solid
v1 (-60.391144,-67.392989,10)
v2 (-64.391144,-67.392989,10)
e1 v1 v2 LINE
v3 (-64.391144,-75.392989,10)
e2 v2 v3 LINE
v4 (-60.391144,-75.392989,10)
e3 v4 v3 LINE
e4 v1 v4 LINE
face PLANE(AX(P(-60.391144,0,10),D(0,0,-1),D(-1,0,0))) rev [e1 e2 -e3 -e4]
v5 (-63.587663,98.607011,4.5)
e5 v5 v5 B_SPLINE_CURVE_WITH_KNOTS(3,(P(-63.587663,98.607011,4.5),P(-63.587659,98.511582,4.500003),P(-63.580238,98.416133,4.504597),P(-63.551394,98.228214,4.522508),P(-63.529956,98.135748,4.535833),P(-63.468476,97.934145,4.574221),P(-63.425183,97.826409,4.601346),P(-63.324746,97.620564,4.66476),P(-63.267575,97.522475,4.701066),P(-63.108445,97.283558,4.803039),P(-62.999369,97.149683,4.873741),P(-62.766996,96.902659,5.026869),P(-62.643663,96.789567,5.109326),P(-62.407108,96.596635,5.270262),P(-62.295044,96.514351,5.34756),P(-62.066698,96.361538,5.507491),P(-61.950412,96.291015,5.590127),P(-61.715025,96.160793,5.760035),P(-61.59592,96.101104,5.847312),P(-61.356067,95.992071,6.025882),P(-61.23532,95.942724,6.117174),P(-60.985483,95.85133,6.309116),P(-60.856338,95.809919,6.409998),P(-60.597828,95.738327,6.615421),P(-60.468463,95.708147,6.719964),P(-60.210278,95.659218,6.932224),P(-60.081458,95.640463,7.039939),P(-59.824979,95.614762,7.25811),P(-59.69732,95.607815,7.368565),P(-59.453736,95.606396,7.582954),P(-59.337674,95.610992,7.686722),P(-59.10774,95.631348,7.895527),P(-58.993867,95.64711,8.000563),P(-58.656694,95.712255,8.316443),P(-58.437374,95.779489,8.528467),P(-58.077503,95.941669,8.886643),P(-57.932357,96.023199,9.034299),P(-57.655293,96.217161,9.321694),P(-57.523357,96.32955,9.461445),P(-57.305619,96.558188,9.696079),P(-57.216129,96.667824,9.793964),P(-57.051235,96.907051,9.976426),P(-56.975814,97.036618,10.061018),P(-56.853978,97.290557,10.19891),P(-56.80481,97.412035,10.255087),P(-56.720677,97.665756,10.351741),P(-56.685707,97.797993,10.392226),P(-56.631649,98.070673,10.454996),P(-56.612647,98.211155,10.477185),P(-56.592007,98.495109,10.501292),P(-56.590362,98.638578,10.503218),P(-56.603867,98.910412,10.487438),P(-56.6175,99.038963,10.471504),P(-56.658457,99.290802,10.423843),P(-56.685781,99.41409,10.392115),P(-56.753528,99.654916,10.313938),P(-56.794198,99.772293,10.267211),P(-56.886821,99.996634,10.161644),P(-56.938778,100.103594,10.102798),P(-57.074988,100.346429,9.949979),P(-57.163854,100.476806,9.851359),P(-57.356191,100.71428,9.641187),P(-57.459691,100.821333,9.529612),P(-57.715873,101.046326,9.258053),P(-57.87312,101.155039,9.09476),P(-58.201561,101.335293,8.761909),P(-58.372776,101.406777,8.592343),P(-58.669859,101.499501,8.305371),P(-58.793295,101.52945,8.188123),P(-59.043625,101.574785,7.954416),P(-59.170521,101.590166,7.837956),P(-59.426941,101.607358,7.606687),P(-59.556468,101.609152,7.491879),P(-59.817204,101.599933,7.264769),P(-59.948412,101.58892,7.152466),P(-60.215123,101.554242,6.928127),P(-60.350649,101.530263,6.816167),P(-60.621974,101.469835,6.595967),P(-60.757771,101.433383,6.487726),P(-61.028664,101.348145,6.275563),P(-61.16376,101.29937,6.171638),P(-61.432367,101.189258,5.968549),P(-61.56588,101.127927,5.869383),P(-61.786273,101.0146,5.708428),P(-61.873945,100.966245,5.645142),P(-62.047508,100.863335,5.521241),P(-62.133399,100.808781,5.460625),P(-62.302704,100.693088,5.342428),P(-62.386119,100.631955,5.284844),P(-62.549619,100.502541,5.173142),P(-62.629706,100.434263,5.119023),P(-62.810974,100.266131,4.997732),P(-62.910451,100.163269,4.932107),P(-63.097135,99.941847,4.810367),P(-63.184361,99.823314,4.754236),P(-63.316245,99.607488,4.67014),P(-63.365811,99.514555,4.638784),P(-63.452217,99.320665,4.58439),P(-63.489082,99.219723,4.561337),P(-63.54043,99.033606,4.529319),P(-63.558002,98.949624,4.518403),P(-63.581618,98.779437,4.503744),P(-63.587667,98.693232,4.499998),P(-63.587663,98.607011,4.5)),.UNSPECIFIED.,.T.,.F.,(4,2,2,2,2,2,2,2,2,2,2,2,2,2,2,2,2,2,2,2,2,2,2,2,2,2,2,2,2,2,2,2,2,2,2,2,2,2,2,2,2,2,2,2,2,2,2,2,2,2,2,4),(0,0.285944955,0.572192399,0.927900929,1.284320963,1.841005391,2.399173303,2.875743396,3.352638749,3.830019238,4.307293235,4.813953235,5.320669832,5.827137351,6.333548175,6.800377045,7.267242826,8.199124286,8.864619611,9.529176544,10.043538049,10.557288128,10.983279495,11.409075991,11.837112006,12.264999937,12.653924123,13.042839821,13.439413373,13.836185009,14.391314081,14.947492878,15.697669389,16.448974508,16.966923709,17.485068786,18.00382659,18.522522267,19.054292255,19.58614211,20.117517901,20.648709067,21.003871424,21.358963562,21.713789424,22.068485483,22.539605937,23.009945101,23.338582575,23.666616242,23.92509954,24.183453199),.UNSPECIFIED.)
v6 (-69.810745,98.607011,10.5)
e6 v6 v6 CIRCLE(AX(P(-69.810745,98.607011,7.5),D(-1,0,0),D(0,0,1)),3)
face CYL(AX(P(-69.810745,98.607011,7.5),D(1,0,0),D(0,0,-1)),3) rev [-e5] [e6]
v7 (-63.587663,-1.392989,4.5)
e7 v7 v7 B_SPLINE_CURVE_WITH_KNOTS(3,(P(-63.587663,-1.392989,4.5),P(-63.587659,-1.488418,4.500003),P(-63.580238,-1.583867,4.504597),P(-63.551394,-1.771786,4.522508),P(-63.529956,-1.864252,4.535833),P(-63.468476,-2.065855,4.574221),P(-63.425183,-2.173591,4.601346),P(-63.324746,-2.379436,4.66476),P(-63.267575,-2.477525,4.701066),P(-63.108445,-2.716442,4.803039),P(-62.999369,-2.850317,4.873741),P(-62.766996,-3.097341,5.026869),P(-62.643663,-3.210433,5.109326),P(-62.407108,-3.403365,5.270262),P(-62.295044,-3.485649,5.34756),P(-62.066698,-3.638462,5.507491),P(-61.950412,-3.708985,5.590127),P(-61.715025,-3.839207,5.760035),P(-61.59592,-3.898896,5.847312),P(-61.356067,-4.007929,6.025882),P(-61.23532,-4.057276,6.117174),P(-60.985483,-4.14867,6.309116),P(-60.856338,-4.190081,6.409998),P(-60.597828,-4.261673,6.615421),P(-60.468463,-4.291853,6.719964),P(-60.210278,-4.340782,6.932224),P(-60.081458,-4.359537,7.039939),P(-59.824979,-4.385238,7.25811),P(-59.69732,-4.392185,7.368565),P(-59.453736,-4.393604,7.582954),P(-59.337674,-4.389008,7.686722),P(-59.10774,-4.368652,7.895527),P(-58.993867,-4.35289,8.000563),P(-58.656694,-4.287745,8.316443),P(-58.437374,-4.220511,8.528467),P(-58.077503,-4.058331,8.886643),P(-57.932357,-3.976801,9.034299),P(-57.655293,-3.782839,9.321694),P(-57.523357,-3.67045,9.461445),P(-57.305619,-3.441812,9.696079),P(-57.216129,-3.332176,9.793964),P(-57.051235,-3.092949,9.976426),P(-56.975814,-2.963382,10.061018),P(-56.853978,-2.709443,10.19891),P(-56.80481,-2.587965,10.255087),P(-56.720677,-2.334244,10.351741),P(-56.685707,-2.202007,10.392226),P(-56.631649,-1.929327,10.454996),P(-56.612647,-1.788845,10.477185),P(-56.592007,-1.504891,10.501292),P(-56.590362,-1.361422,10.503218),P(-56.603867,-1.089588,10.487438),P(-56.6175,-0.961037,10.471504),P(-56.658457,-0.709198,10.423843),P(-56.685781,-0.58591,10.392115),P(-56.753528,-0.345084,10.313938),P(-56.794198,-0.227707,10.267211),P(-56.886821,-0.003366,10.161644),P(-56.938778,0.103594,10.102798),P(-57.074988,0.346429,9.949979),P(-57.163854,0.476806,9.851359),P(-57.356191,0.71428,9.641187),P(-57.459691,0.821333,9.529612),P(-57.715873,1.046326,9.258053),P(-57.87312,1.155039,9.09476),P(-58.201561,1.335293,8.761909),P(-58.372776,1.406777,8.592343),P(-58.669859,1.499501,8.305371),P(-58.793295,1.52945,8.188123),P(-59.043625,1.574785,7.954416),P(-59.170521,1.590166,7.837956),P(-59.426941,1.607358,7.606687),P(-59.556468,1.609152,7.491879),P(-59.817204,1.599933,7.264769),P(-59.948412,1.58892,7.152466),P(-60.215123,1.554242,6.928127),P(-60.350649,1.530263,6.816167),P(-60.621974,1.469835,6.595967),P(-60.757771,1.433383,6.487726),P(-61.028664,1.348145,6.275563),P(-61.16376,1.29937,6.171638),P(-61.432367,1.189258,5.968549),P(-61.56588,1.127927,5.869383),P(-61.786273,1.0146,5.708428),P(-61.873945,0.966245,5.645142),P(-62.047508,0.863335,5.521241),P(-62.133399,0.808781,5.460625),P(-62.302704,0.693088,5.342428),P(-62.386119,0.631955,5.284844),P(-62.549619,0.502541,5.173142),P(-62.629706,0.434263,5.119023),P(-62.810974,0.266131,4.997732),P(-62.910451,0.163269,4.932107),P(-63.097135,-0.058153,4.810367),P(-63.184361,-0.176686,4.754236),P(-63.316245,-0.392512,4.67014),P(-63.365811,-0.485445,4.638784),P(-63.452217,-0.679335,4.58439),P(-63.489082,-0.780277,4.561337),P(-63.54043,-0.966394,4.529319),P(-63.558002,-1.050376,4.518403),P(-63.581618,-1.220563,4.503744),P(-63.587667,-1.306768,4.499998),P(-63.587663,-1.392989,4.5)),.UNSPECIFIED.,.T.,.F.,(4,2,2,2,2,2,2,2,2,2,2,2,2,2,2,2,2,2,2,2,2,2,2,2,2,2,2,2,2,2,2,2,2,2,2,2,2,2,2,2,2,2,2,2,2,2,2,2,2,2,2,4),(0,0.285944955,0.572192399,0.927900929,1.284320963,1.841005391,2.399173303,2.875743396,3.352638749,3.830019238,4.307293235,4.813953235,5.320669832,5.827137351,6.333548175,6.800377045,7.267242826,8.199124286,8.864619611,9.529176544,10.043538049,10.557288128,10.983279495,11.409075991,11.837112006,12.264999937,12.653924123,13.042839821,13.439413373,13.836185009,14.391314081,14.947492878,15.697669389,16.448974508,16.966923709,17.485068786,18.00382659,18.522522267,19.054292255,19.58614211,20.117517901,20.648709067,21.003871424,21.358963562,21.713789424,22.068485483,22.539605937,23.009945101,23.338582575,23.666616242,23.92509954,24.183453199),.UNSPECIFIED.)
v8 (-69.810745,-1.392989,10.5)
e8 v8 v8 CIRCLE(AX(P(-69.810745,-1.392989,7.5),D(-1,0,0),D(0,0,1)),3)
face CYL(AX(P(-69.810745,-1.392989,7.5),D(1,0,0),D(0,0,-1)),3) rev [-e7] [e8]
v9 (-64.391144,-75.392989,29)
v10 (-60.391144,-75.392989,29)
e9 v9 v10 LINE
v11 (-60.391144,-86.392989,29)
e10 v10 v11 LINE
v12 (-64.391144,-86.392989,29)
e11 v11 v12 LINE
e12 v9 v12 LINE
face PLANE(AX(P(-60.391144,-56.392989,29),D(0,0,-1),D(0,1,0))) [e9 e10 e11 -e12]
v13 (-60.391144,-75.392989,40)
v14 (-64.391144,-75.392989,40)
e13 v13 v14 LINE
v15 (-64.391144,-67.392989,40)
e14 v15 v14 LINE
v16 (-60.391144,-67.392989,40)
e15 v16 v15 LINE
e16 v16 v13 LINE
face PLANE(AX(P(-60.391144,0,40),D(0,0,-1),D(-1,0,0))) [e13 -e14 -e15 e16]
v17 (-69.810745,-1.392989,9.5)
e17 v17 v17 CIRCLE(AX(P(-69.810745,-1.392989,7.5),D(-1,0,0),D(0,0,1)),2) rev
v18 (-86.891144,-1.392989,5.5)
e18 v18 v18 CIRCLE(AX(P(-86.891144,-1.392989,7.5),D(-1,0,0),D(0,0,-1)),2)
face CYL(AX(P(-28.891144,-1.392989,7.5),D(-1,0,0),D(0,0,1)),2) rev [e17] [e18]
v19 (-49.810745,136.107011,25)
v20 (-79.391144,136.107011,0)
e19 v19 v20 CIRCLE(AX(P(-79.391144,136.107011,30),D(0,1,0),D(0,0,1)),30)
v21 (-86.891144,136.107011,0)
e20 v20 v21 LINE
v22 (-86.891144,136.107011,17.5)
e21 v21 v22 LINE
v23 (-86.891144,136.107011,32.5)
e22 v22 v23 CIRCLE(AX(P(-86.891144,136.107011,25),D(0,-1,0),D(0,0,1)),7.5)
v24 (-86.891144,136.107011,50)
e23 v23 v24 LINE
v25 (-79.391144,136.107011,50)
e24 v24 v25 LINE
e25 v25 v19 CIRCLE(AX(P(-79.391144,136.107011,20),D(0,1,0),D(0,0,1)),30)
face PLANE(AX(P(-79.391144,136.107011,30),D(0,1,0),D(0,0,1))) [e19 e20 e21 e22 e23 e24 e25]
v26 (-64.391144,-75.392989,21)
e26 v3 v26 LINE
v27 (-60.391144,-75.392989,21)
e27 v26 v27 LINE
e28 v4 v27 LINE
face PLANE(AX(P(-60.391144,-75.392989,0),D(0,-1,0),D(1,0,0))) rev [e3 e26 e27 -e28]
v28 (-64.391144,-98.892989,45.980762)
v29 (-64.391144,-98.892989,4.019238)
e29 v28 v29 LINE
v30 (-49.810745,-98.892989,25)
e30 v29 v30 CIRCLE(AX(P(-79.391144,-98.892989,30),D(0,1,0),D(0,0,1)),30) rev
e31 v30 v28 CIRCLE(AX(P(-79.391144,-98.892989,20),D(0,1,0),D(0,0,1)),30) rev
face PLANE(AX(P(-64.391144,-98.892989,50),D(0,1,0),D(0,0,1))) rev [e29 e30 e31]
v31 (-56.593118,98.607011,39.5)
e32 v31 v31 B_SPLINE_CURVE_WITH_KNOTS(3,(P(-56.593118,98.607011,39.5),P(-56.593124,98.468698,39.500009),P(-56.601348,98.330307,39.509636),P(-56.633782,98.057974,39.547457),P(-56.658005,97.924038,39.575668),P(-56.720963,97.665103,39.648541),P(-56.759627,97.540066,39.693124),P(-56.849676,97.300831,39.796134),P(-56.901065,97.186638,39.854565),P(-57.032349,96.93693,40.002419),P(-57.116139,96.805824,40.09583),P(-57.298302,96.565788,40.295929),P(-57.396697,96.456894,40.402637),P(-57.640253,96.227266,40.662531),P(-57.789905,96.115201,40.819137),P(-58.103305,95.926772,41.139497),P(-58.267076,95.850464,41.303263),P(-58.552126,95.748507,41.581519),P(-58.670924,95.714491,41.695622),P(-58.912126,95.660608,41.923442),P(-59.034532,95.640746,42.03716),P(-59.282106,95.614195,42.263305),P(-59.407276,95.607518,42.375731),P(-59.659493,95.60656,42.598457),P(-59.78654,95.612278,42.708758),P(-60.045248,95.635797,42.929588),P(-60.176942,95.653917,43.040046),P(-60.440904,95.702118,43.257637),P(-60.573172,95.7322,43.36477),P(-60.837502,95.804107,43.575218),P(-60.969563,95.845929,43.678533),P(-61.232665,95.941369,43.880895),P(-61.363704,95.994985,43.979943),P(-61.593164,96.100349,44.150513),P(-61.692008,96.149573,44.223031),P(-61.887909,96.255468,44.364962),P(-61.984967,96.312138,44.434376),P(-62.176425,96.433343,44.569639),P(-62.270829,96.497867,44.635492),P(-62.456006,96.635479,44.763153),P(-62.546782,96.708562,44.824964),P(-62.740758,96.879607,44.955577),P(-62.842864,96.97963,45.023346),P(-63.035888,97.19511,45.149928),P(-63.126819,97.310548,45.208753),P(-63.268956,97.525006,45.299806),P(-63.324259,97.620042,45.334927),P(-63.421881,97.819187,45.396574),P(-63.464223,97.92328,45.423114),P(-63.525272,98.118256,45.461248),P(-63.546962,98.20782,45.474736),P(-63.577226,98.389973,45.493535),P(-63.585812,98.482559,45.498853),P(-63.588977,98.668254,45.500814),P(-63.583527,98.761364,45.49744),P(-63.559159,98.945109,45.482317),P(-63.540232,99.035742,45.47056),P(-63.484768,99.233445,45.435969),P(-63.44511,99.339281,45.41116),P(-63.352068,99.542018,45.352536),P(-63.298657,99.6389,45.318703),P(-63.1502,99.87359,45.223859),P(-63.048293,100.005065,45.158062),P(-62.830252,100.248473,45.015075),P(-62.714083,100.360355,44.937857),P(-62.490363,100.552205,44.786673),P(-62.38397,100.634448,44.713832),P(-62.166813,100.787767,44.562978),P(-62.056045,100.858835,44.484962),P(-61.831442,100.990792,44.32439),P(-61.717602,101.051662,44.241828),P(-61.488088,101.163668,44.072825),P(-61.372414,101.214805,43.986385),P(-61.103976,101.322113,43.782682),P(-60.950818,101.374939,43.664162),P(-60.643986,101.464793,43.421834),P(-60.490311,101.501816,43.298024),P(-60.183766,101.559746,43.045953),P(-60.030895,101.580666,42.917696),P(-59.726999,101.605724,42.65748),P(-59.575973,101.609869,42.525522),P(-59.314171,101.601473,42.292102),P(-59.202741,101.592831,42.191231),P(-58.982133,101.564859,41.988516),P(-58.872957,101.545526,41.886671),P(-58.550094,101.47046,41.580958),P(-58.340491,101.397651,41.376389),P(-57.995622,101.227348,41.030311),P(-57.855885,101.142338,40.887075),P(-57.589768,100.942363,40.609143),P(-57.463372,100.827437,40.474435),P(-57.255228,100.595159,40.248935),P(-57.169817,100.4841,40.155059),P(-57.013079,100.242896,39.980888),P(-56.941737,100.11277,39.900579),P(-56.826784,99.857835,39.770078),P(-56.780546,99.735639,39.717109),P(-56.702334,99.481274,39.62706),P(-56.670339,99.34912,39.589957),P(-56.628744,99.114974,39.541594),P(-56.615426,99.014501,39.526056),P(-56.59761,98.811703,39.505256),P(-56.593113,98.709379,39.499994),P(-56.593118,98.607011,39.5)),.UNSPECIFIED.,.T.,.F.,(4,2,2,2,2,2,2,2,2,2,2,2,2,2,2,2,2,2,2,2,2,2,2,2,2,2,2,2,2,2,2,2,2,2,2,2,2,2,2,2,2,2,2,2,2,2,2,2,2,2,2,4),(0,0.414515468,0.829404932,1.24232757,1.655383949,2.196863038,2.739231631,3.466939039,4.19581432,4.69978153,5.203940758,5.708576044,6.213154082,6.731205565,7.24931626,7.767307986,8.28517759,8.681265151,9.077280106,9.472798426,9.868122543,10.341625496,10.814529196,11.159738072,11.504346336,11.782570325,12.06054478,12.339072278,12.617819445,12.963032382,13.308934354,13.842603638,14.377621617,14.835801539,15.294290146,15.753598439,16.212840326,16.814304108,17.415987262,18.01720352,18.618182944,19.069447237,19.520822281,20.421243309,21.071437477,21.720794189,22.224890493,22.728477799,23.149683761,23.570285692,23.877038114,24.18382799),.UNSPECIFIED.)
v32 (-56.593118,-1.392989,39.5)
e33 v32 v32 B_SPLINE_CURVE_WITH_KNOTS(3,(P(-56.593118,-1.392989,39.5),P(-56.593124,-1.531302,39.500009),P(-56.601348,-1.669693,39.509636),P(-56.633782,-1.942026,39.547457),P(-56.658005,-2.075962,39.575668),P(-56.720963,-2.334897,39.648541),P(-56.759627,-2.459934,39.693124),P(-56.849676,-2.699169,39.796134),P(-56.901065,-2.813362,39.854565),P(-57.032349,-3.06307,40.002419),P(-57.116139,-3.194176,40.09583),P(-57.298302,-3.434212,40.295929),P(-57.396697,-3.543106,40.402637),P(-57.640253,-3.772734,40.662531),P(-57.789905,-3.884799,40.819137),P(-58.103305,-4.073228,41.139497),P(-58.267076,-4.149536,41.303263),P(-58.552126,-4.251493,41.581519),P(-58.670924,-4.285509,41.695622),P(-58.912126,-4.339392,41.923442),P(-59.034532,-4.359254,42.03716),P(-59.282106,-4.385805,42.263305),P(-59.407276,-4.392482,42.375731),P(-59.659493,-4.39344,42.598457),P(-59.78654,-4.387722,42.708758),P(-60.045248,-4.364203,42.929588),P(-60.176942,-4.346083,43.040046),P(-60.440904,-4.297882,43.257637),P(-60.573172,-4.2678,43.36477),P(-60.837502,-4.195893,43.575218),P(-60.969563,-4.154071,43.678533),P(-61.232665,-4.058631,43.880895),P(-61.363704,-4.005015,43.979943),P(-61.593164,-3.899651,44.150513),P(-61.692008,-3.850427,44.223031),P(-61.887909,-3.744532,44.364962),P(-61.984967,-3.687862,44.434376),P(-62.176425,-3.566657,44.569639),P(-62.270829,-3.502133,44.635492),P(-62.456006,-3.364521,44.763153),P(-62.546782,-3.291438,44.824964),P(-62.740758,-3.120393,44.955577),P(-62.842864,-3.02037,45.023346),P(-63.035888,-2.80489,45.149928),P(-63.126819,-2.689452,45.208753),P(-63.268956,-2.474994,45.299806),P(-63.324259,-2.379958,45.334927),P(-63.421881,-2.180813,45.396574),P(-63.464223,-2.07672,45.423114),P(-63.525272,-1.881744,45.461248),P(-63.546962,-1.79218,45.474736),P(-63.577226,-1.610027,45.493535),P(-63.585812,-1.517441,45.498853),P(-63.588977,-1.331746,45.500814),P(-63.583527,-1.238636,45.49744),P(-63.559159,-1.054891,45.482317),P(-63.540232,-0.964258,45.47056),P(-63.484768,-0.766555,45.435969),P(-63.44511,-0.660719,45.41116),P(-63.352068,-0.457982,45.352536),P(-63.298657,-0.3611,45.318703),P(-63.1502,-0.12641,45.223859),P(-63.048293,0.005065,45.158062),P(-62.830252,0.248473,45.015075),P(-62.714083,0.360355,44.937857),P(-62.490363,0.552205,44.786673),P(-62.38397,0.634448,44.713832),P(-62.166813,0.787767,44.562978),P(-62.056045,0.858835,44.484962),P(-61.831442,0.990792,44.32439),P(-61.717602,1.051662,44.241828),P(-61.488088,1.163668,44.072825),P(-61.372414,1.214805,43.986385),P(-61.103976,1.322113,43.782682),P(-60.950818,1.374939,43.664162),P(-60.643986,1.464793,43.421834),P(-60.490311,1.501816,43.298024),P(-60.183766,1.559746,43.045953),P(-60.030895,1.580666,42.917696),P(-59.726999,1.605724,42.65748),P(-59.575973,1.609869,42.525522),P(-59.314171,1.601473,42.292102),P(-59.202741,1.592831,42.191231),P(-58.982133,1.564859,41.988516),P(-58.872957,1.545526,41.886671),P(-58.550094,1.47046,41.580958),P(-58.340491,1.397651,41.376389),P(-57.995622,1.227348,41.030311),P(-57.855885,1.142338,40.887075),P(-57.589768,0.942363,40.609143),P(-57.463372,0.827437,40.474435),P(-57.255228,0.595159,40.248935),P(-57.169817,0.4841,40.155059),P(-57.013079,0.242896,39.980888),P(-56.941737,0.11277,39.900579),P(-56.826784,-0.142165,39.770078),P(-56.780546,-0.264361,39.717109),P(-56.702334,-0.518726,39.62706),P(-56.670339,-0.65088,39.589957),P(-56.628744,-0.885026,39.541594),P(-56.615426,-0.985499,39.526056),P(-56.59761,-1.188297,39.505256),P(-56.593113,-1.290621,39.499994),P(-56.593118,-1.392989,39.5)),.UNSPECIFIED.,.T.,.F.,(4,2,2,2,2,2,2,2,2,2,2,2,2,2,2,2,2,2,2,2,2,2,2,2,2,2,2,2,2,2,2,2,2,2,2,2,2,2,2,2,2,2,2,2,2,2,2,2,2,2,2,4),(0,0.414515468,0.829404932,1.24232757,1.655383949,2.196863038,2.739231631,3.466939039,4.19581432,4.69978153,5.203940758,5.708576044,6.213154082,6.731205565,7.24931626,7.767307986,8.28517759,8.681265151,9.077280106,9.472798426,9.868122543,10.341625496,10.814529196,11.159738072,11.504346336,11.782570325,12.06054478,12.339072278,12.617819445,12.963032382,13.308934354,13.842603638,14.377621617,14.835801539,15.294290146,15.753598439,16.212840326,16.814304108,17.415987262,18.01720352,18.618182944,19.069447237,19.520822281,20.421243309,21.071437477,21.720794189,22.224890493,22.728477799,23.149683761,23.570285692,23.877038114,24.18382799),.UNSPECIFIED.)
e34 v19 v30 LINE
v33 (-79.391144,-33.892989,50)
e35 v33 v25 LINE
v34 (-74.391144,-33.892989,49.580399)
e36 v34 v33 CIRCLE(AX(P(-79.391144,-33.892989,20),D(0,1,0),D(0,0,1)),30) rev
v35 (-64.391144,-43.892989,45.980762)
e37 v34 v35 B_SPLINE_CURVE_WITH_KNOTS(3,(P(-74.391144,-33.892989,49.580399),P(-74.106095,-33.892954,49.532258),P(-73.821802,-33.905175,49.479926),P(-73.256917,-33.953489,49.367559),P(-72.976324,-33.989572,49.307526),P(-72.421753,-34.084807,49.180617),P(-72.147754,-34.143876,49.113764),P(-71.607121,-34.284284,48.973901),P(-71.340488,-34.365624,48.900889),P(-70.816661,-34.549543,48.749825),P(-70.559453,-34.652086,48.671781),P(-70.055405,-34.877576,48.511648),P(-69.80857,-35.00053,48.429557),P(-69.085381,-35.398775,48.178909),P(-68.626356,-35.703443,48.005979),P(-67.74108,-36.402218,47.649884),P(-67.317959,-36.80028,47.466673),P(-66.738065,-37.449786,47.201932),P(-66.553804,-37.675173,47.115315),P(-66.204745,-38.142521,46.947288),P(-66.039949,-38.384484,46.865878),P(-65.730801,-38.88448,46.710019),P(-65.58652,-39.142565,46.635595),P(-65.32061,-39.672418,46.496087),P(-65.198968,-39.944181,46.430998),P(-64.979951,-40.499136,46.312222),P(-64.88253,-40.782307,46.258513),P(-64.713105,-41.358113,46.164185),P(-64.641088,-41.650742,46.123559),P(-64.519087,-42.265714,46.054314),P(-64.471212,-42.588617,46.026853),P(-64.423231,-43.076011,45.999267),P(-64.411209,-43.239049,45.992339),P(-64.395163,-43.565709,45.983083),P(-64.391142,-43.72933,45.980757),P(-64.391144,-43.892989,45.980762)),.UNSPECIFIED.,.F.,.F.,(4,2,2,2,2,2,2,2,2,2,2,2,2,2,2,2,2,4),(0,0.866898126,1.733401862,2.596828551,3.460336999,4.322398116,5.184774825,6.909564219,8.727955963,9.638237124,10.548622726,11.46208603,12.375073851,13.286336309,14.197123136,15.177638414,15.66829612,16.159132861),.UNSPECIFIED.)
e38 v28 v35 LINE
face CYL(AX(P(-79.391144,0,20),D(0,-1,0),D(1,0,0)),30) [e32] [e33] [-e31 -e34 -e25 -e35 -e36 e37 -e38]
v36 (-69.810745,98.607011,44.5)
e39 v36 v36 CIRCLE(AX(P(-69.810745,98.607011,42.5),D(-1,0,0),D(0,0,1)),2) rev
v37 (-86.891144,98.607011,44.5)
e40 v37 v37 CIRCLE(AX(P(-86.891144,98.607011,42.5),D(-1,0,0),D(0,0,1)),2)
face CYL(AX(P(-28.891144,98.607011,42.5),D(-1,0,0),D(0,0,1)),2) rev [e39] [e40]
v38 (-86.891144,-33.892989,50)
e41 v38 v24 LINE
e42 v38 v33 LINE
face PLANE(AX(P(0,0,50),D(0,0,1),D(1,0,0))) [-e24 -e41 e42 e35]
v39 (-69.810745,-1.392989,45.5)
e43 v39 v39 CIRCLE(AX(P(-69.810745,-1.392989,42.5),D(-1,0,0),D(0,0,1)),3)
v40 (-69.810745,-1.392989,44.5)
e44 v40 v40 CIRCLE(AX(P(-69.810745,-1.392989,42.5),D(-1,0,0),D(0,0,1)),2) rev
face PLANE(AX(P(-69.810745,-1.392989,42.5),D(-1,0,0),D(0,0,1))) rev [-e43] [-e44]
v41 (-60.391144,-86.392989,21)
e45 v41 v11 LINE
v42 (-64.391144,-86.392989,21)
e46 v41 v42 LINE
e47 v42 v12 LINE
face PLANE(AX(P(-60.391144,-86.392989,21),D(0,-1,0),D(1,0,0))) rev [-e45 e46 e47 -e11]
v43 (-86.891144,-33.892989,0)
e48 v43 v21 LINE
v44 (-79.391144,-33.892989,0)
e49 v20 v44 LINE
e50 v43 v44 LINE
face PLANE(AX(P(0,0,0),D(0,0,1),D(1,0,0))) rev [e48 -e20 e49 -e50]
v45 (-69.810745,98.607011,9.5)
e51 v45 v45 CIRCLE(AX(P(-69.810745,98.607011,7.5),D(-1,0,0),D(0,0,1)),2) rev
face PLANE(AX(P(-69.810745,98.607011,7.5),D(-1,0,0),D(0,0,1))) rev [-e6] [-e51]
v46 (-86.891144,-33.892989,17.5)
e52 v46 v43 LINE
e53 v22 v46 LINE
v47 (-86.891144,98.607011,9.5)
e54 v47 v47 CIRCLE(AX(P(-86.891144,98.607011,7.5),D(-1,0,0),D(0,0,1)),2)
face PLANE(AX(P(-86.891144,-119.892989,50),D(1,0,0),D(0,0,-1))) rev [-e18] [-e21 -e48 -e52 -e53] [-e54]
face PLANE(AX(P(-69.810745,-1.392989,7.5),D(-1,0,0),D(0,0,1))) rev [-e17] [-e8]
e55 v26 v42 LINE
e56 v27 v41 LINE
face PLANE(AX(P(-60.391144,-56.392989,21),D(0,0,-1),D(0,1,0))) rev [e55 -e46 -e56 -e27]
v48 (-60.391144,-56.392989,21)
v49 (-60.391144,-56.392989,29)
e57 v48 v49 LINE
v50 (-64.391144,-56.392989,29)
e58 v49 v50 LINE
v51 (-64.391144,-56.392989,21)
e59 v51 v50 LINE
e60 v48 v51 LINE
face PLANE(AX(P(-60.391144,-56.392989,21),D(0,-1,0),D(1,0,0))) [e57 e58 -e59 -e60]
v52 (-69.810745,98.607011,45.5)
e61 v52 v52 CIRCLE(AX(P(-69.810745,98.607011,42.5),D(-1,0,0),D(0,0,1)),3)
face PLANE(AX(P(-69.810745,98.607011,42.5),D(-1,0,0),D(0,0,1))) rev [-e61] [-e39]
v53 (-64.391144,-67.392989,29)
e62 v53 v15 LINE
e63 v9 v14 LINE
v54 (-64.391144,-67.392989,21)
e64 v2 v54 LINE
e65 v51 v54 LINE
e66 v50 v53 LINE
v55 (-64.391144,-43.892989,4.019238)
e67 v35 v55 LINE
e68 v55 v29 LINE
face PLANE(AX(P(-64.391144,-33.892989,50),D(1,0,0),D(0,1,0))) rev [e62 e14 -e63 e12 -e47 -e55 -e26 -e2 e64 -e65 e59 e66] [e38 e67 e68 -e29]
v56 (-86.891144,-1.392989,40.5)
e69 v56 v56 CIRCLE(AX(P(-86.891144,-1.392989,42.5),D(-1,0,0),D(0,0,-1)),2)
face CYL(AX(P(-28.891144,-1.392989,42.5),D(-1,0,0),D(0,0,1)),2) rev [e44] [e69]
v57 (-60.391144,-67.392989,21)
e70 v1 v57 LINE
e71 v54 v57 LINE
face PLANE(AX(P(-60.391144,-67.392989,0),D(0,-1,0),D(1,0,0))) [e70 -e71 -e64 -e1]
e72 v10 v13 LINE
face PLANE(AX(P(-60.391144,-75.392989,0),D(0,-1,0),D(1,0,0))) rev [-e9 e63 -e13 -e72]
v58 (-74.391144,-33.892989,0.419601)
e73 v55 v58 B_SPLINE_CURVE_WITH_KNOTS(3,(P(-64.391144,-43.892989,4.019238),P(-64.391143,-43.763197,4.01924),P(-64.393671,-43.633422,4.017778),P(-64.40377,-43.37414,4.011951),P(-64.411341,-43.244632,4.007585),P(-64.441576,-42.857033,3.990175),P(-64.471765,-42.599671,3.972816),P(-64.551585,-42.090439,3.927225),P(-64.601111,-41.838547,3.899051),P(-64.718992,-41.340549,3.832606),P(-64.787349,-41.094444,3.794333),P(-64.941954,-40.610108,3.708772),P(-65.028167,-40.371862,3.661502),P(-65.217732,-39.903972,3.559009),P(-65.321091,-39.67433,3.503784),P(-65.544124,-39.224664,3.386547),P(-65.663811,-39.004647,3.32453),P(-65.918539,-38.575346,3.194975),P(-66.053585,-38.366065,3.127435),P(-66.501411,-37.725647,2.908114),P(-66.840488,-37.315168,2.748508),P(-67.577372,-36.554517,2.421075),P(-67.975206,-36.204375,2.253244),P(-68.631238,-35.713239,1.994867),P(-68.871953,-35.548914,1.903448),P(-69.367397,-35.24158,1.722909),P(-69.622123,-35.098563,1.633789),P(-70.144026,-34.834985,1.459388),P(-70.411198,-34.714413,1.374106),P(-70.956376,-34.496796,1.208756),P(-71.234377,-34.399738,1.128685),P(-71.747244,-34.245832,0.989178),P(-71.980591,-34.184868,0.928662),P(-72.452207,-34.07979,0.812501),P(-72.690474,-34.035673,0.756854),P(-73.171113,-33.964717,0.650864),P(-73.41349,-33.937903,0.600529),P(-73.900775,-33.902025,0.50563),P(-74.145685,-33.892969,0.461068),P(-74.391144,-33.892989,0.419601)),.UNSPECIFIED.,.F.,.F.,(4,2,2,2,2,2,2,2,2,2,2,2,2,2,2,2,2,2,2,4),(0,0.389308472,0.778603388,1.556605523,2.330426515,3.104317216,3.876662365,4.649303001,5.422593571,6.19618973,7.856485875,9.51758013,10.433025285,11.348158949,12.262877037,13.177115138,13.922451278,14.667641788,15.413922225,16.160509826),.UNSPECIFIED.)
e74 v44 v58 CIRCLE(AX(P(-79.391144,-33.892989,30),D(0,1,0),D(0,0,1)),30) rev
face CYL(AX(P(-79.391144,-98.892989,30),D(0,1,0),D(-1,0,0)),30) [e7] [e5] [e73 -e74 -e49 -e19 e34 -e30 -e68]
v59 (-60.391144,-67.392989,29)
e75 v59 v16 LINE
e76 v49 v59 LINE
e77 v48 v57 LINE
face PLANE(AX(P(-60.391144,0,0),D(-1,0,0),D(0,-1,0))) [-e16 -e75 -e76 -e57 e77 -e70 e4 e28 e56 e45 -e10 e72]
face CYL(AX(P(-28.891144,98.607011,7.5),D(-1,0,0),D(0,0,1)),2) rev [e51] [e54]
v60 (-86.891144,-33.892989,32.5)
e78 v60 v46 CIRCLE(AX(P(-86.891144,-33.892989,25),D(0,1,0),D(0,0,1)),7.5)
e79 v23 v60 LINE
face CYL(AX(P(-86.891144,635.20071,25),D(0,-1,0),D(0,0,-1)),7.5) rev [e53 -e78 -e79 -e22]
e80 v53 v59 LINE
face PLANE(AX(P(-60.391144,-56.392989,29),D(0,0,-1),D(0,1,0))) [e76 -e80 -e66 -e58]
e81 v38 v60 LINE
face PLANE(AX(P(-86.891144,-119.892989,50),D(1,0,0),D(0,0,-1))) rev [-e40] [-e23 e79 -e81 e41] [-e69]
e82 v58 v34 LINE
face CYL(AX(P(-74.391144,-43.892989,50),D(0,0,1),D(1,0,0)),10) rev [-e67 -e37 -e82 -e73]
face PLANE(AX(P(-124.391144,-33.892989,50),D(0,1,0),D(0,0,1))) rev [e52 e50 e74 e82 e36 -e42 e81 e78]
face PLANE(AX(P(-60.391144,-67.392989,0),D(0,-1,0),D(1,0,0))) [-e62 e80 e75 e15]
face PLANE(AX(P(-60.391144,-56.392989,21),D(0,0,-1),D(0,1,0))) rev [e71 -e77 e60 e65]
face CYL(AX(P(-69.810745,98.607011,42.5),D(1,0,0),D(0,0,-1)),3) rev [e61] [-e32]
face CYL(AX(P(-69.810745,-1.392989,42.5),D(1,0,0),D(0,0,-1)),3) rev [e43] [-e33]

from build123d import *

# Parameters (mm, degrees)
BOSS_EXTRU_1_DEPTH            = 50
CONG_4_R                      = 35
CONG_5_R                      = 35
CONG_6_R                      = 30
CONG_12_R                     = 10
ENL_V_MAT_EXTRU_8_DEPTH       = 251
ESQUISSE6_R                   = 2
ENL_V_MAT_EXTRU_9_DEPTH       = 58
ENL_V_MAT_EXTRU_12_DEPTH      = 251.898527225
ENL_V_MAT_EXTRU_12_DEPTH_BACK = 179
ESQUISSE11_R                  = 3
ENL_V_MAT_EXTRU_14_DEPTH      = 20
BOSS_EXTRU_2_DEPTH            = 5
ESQUISSE13_W                  = 8
ESQUISSE13_H                  = 30
ESQUISSE13_W_2                = 30
ESQUISSE13_H_2                = 8
ENL_V_MAT_EXTRU_15_DEPTH      = 4


with BuildPart() as part:
    # Esquisse1 → Boss.-Extru.1 (new body)
    with BuildSketch(Plane.XY):
        Polygon((-129.391143911, 131.10701107), (-129.391143911, -98.89298893), (-124.391143911, -98.89298893), (-124.391143911, -33.89298893), (-64.391143911, -33.89298893), (-64.391143911, -98.89298893), (-49.391143911, -98.89298893), (-49.391143911, 131.10701107), align=None)
    extrude(amount=BOSS_EXTRU_1_DEPTH)

    # Congé4
    cong_4_edges = [part.edges().sort_by_distance(p)[0] for p in [
        (-129.391143911, 16.10701107, 50),
    ]]
    fillet(cong_4_edges, radius=CONG_4_R)

    # Congé5
    # the kernel refuses this fillet: 35 mm, written as the material it takes off along each edge
    with BuildSketch(Plane(origin=(-129.391143911, 202.914044152, 0), x_dir=(0, 0, 1), z_dir=(0, -1, 0))) as cong_5_piece_1:
        with BuildLine():
            CenterArc((35, -28.722813233), CONG_5_R, 124.849904579, 55.150095421)
            Line((0, -28.722813233), (-0.7, -28.722813233))
            Line((-0.7, -28.722813233), (-0.7, 0))
            Line((-0.7, 0), (0, 0.7))
            ThreePointArc((0, 0.7), (7.5, 0.7), (14.6, 0.574456265))
            Line((14.6, 0.574456265), (15, 0))
        make_face()
    extrude(amount=373.614066163, mode=Mode.SUBTRACT)

    # Congé6
    # the kernel refuses this fillet: 30 mm, written as the material it takes off along each edge
    with BuildSketch(Plane(origin=(-49.391143911, -173.89298893, 0), x_dir=(-1, 0, 0), z_dir=(0, 1, 0))) as cong_6_piece_1:
        with BuildLine():
            CenterArc((CONG_6_R, CONG_6_R), CONG_6_R, 180, 90)
            Line((0, CONG_6_R), (0, 0))
            Line((0, 0), (CONG_6_R, 0))
        make_face()
    extrude(amount=380, mode=Mode.SUBTRACT)
    with BuildSketch(Plane(origin=(-49.391143911, -173.89298893, 50), x_dir=(-1, 0, 0), z_dir=(0, 1, 0))) as cong_6_piece_2:
        with BuildLine():
            CenterArc((CONG_6_R, -CONG_6_R), CONG_6_R, 90, 90)
            Line((0, -CONG_6_R), (0, 0))
            Line((0, 0), (CONG_6_R, 0))
        make_face()
    extrude(amount=380, mode=Mode.SUBTRACT)

    # Congé12
    cong_12_edges = [part.edges().sort_by_distance(p)[0] for p in [
        (-124.391143911, -33.89298893, 21.146981396),
        (-64.391143911, -33.89298893, 25),
    ]]
    fillet(cong_12_edges, radius=CONG_12_R)

    # Esquisse5 → Enlèv. mat.-Extru.8 (cut)
    with BuildSketch(Plane(origin=(0, 131.10701107, 0), x_dir=(1, 0, 0), z_dir=(0, 1, 0))):
        with BuildLine():
            Line((-86.891143911, -50), (-86.891143911, 0))
            ThreePointArc((-86.891143911, 0), (-162.141280076, -25), (-86.891143911, -50))
        make_face()
    extrude(amount=-ENL_V_MAT_EXTRU_8_DEPTH, mode=Mode.SUBTRACT)

    # Esquisse6 → Enlèv. mat.-Extru.9 (cut)
    with BuildSketch(Plane.ZY.offset(86.891143911)):
        with Locations((7.5, 98.60701107)):
            Circle(ESQUISSE6_R)
        with Locations((42.5, 98.60701107)):
            Circle(ESQUISSE6_R)
        with Locations((42.5, -1.39298893)):
            Circle(ESQUISSE6_R)
        with Locations((7.5, -1.39298893)):
            Circle(ESQUISSE6_R)
    extrude(amount=-ENL_V_MAT_EXTRU_9_DEPTH, mode=Mode.SUBTRACT)

    # Esquisse9 → Enlèv. mat.-Extru.12 (cut, two sides: drawn at the far end of the back side and taken through both)
    with BuildSketch(Plane(origin=(0, 131.10701107, 0), x_dir=(1, 0, 0), z_dir=(0, 1, 0)).offset(-ENL_V_MAT_EXTRU_12_DEPTH_BACK)):
        with BuildLine():
            Line((-195.505666121, -17.5), (-86.891143911, -17.5))
            ThreePointArc((-86.891143911, -17.5), (-79.391143911, -25), (-86.891143911, -32.5))
            Line((-86.891143911, -32.5), (-195.505666121, -32.5))
            Line((-195.505666121, -32.5), (-412.73471054, -32.5))
            Line((-412.73471054, -32.5), (-412.73471054, -17.5))
            Line((-412.73471054, -17.5), (-195.505666121, -17.5))
        make_face()
    extrude(amount=ENL_V_MAT_EXTRU_12_DEPTH + ENL_V_MAT_EXTRU_12_DEPTH_BACK, mode=Mode.SUBTRACT)

    # Esquisse11 → Enlèv. mat.-Extru.14 (cut)
    with BuildSketch(Plane.ZY.offset(49.810744996)):
        with Locations(Location((42.5, 98.60701107, 0), (0, 0, 180))):
            Circle(ESQUISSE11_R)
        with Locations(Location((7.5, 98.60701107, 0), (0, 0, 180))):
            Circle(ESQUISSE11_R)
        with Locations(Location((42.5, -1.39298893, 0), (0, 0, 180))):
            Circle(ESQUISSE11_R)
        with Locations(Location((7.5, -1.39298893, 0), (0, 0, 180))):
            Circle(ESQUISSE11_R)
    extrude(amount=ENL_V_MAT_EXTRU_14_DEPTH, mode=Mode.SUBTRACT)

    # Esquisse12 → Boss.-Extru.2 (add)
    with BuildSketch(Plane(origin=(0, 131.10701107, 0), x_dir=(1, 0, 0), z_dir=(0, 1, 0))):
        with BuildLine():
            Line((-79.391143911, 0), (-86.891143911, 0))
            Line((-86.891143911, 0), (-86.891143911, -17.5))
            ThreePointArc((-86.891143911, -17.5), (-79.391143911, -25), (-86.891143911, -32.5))
            Line((-86.891143911, -32.5), (-86.891143911, -50))
            Line((-86.891143911, -50), (-79.391143911, -50))
            ThreePointArc((-79.391143911, -50), (-60.02622718, -42.912878475), (-49.810744996, -25))
            ThreePointArc((-49.810744996, -25), (-60.02622718, -7.087121525), (-79.391143911, 0))
        make_face()
    extrude(amount=BOSS_EXTRU_2_DEPTH)

    # Esquisse13 → Enlèv. mat.-Extru.15 (cut)
    with BuildSketch(Plane.ZY.offset(64.391143911)):
        with Locations((25, -71.39298893)):
            Rectangle(ESQUISSE13_W, ESQUISSE13_H)
        with Locations((25, -71.39298893)):
            Rectangle(ESQUISSE13_W_2, ESQUISSE13_H_2)
    extrude(amount=-ENL_V_MAT_EXTRU_15_DEPTH, mode=Mode.SUBTRACT)


solid = part.part
